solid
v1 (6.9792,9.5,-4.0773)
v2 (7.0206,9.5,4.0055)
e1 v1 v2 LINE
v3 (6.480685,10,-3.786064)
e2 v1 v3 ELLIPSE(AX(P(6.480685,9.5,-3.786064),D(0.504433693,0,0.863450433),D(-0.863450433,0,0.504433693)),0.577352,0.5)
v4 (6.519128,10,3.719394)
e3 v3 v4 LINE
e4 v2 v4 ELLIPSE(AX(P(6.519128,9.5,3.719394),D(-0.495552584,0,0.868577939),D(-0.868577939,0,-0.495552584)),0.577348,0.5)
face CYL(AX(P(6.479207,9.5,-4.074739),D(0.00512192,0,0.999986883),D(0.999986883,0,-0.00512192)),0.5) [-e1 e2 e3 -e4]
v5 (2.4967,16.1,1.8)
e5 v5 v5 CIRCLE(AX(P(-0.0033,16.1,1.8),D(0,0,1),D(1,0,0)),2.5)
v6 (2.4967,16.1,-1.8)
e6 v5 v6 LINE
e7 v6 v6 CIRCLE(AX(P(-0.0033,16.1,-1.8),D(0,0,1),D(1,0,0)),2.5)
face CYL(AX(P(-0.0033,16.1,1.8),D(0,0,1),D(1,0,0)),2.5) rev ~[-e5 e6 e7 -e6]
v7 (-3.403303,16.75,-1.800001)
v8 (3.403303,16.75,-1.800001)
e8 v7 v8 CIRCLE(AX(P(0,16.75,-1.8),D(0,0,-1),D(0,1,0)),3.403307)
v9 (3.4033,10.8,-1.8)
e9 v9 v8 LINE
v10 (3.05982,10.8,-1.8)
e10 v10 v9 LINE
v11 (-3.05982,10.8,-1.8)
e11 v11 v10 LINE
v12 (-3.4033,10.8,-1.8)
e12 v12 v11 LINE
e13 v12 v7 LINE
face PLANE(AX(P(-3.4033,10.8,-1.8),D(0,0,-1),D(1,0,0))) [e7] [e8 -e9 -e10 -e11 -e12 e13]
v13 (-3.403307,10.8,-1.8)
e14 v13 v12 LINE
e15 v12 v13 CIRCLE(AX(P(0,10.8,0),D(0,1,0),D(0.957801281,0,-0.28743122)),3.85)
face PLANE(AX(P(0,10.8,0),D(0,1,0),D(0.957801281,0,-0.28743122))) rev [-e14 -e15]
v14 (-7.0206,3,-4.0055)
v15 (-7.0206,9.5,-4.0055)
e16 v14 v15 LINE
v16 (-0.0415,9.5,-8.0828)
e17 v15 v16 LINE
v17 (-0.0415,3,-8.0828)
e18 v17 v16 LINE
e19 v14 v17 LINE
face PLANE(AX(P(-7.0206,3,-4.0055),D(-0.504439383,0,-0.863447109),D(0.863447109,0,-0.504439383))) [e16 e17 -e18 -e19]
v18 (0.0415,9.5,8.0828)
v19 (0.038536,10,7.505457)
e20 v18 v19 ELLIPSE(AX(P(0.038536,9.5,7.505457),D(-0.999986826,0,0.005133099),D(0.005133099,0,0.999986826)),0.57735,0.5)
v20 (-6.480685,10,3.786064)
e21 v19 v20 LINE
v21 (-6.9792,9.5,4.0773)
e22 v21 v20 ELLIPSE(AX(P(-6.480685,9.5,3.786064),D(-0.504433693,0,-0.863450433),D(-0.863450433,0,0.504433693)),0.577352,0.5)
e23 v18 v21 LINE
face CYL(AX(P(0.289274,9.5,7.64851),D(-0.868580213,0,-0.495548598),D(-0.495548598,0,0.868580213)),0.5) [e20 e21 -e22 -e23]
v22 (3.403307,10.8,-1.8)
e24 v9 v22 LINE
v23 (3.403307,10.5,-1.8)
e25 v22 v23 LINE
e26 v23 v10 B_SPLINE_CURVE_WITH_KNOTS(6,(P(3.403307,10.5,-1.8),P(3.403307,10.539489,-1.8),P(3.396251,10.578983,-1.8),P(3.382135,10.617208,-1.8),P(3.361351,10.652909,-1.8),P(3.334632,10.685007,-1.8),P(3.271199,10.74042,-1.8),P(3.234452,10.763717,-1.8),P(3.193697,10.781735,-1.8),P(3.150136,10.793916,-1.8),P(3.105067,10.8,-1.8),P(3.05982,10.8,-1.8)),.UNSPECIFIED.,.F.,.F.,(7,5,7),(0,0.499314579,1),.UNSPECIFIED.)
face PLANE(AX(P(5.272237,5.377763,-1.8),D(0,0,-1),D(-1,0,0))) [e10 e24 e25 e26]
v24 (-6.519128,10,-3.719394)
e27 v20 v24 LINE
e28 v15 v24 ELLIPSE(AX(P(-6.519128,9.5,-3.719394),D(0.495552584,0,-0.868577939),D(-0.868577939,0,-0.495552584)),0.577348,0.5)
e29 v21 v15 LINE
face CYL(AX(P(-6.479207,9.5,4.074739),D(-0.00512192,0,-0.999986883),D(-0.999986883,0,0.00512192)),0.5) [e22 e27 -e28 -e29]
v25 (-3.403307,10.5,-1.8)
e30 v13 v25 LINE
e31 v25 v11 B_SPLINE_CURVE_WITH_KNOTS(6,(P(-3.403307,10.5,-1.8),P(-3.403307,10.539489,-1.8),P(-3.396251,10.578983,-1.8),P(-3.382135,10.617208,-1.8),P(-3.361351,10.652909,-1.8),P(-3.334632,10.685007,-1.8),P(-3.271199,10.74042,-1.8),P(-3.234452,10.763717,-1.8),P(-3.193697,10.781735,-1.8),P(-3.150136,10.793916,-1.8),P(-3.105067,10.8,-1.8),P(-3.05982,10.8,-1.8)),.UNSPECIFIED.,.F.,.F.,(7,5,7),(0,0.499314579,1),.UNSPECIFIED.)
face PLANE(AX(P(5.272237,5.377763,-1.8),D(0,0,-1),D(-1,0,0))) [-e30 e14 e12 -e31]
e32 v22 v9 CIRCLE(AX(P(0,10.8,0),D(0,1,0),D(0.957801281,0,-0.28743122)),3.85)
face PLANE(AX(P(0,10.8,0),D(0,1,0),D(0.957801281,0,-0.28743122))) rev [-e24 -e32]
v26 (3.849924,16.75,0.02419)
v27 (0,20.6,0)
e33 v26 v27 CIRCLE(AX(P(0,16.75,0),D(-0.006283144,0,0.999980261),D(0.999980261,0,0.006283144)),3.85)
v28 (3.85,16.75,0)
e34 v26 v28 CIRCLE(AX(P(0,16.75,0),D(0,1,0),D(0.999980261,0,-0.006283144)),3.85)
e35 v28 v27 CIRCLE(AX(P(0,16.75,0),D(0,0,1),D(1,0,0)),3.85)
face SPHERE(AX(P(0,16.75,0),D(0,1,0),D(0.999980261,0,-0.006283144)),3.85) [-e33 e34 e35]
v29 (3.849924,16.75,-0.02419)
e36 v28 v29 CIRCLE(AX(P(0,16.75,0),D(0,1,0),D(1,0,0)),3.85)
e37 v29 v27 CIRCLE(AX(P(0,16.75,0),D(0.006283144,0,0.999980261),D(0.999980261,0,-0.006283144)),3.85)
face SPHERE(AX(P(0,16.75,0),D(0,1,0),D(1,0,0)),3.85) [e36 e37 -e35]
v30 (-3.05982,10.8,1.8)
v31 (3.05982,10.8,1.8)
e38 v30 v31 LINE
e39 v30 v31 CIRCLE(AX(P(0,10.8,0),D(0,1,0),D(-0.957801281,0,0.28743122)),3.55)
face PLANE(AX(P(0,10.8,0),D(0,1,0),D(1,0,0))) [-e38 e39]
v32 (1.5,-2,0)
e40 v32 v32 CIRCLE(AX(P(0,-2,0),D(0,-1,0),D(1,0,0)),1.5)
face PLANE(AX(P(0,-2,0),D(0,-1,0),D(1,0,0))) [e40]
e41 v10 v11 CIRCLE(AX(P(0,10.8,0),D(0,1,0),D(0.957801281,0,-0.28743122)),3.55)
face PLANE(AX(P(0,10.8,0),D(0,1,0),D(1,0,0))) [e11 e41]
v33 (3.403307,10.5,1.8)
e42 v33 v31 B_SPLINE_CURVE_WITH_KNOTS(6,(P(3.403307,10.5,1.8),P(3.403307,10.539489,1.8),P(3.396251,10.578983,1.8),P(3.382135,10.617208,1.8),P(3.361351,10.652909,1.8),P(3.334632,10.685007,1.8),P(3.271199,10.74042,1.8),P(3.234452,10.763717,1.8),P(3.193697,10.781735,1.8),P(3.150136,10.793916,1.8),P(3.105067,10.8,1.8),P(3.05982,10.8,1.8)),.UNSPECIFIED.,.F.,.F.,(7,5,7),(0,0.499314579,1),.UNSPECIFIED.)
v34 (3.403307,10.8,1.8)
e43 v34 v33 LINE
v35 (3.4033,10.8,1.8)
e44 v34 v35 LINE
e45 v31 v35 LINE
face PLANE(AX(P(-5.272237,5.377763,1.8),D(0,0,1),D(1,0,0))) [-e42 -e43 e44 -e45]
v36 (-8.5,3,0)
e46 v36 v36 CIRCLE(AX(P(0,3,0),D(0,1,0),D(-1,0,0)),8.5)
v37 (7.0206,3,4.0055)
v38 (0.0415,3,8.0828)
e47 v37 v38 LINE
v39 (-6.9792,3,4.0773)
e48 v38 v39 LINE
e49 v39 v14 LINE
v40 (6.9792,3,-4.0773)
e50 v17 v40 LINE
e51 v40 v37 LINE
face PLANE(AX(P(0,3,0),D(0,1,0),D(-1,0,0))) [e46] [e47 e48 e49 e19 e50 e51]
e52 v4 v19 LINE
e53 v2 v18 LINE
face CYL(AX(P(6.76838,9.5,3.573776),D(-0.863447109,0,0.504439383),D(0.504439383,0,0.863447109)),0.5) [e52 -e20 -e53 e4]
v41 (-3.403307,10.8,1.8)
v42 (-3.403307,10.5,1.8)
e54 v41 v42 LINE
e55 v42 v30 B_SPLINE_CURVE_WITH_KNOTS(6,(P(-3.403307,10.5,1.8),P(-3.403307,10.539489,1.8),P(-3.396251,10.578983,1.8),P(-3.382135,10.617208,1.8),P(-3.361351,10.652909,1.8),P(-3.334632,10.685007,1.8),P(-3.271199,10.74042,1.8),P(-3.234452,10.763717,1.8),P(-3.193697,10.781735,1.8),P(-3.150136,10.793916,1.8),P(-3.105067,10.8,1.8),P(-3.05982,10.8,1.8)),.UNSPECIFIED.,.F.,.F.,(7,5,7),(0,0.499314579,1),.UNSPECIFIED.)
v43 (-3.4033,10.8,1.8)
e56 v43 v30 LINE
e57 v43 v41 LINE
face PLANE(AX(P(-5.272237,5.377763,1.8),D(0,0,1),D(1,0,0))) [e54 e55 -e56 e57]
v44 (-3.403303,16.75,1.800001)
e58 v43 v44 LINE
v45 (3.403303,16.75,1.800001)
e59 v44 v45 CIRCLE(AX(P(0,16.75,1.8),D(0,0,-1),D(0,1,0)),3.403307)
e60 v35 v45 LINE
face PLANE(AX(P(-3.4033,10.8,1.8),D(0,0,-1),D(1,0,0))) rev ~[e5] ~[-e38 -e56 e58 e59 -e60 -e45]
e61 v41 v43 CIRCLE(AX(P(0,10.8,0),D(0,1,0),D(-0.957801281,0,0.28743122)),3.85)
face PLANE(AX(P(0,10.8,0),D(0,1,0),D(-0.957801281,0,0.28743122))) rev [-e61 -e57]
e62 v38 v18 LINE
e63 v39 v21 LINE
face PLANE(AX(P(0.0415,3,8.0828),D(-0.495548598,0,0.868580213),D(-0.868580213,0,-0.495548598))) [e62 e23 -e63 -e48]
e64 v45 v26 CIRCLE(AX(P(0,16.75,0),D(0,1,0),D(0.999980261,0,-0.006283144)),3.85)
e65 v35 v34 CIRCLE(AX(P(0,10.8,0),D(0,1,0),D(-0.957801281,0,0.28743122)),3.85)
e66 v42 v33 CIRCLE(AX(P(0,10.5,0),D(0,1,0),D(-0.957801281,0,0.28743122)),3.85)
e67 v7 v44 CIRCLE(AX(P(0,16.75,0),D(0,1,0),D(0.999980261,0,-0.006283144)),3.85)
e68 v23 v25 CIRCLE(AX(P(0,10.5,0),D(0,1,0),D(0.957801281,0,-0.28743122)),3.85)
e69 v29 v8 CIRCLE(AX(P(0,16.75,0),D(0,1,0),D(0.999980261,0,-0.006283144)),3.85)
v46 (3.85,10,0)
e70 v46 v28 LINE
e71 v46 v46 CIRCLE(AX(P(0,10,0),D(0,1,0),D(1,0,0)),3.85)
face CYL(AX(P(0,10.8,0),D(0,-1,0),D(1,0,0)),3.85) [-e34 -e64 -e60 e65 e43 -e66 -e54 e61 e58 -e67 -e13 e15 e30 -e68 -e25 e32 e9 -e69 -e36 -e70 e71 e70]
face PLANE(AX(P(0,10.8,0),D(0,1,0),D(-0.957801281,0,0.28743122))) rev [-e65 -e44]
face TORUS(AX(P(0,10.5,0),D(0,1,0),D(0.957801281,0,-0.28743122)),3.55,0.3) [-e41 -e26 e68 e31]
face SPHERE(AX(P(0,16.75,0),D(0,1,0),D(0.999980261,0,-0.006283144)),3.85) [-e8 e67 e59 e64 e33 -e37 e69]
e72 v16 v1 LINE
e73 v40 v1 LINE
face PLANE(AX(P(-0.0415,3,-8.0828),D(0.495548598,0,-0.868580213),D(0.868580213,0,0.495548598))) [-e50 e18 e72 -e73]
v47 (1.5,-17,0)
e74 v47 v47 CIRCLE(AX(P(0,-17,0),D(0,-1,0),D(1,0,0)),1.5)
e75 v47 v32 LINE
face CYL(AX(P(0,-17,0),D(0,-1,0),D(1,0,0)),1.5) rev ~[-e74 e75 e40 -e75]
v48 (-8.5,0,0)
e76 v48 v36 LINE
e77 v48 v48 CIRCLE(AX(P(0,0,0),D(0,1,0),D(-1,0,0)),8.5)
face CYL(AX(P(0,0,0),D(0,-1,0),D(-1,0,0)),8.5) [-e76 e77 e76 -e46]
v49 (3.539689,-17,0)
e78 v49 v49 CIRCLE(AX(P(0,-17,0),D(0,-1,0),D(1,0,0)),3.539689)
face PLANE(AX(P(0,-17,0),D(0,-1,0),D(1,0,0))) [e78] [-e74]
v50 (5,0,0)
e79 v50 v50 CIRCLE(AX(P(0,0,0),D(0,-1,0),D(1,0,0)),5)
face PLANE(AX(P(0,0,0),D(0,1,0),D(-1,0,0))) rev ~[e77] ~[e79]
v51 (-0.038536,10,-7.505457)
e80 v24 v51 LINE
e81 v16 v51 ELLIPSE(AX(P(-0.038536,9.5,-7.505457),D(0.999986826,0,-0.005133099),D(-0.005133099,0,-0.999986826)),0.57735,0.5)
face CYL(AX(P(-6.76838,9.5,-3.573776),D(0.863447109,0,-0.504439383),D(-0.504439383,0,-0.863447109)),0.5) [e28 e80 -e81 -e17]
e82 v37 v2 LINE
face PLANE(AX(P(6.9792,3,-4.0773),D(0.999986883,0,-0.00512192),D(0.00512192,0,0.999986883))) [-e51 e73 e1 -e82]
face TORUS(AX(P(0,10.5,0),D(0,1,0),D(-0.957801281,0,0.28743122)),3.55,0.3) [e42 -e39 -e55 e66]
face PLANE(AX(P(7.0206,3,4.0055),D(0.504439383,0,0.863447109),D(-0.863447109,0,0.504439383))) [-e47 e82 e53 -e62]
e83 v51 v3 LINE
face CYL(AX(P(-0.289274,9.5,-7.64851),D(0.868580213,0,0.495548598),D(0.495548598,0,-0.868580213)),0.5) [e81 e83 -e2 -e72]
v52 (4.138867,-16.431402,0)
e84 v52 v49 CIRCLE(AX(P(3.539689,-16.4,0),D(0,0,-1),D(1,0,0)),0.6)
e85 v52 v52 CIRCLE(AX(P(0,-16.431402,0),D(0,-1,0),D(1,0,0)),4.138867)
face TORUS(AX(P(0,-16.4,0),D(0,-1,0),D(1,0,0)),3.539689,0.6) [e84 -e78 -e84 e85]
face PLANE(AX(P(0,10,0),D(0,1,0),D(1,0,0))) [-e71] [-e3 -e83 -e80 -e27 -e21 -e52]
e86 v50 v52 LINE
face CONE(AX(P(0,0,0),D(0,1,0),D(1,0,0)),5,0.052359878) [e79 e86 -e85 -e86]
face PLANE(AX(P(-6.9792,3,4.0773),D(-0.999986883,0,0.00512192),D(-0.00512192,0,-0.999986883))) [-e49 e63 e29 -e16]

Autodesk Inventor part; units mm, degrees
ref_plane "YZ Plane" through (0, 0, 0) normal (1, 0, 0) x (0, 1, 0)
ref_plane "XZ Plane" through (0, 0, 0) normal (0, 1, 0) x (-1, 0, 0)
ref_plane "XY Plane" through (0, 0, 0) normal (0, 0, 1) x (1, 0, 0)
sketch "Sketch1" plane through (0, 0, 0) normal (0, 1, 0) x (-1, 0, 0)
  circle A0 centre (0, 0) radius 8.5
  dimension "d0" = 17
extrude "Extrusion1" add sketch "Sketch1" along normal blind 3
sketch "Sketch2" plane through (0, 3, 0) normal (0, 1, 0) x (1, 0, 0)
  line L0 (-7.0206, 4.0055) -> (-0.0415, 8.0828)
  line L1 (-0.0415, 8.0828) -> (6.9792, 4.0773)
  line L2 (6.9792, 4.0773) -> (7.0206, -4.0055)
  line L3 (7.0206, -4.0055) -> (0.0415, -8.0828)
  line L4 (0.0415, -8.0828) -> (-6.9792, -4.0773)
  line L5 (-6.9792, -4.0773) -> (-7.0206, 4.0055)
  point P0 (0, 0)
  point P1 (0, 0)
  dimension "d3" = 14
extrude "Extrusion2" add sketch "Sketch2" along normal blind 7
fillet "Fillet1" radius 0.5 6 edges at (3.531, 10, 6.0441) (6.9999, 10, -0.0359) (-3.4689, 10, 6.08) (-6.9999, 10, 0.0359) (-3.531, 10, -6.0441) (3.4689, 10, -6.08)
sketch "Sketch3" plane through (0, 10, 0) normal (0, 1, 0) x (1, 0, 0)
  circle A0 centre (0, 0) radius 3.85
  dimension "d7" = 7.7
extrude "Extrusion3" add sketch "Sketch3" along normal blind 0.8
sketch "Sketch4" plane through (0, 10.8, 0) normal (0, 1, 0) x (1, 0, 0)
  circle A0 centre (0, 0) radius 3.85 projected
  line L0 (-3.4033, -1.8) -> (3.4033, -1.8)
  line L1 (-3.4033, 1.8) -> (3.4033, 1.8)
  arc A1 (-3.4033, 1.8) -> (-3.4033, -1.8) centre (0, 0) ccw
  arc A2 (3.4033, -1.8) -> (3.4033, 1.8) centre (0, 0) ccw
  dimension "d11" = 3.6
extrude "Extrusion4" add sketch "Sketch4" along normal blind 9.8 contours A0 L0 L1
sketch "Sketch5" plane through (-3.4033, 10.8, 1.8) normal (0, 0, 1) x (1, 0, 0)
  circle A0 centre (3.4, 5.3) radius 2.5
  line L0 (0, 0) -> (0, 9.8) projected
  line L1 (6.8066, 0) -> (6.8066, 9.8) projected
  line L2 (0, 9.8) -> (6.8066, 9.8) projected
  point P0 (3.4033, -10.8)
  dimension "d15" = 5
  dimension "d16" = 3.4
  dimension "d17" = 3.4066
  dimension "d18" = 4.5
extrude "Extrusion5" cut sketch "Sketch5" against normal blind 9.8
fillet "Fillet3" radius 3.85 1 edges at (3.85, 20.6, 0)
sketch "Sketch6" plane through (0, 0, 0) normal (0, -1, 0) x (1, 0, 0)
  circle A0 centre (0, 0) radius 5
  dimension "d22" = 10
extrude "Extrusion6" add sketch "Sketch6" along normal blind 17
draft "FaceDraft1" angle 3 pull direction (0, -1, 0) faces at (4.9353, -11.3333, -0.8021) fixed edges at (-5, 0, 0)
sketch "Sketch8" plane through (0, -17, 0) normal (0, -1, 0) x (1, 0, 0)
  circle A0 centre (0, 0) radius 1.5
  dimension "d26" = 3
extrude "Extrusion7" cut sketch "Sketch8" against normal blind 15
fillet "Fillet4" radius 0.3 2 edges at (0, 10.8, 3.85) (0, 10.8, -3.85)
ref_plane "Work Plane1" through (0, -28, 0) normal (0, 1, 0) x (0.6995635, 0, 0.7145704)
fillet "Fillet5" radius 0.6 1 edges at (-4.1091, -17, 0)
properties part number "cast1"
